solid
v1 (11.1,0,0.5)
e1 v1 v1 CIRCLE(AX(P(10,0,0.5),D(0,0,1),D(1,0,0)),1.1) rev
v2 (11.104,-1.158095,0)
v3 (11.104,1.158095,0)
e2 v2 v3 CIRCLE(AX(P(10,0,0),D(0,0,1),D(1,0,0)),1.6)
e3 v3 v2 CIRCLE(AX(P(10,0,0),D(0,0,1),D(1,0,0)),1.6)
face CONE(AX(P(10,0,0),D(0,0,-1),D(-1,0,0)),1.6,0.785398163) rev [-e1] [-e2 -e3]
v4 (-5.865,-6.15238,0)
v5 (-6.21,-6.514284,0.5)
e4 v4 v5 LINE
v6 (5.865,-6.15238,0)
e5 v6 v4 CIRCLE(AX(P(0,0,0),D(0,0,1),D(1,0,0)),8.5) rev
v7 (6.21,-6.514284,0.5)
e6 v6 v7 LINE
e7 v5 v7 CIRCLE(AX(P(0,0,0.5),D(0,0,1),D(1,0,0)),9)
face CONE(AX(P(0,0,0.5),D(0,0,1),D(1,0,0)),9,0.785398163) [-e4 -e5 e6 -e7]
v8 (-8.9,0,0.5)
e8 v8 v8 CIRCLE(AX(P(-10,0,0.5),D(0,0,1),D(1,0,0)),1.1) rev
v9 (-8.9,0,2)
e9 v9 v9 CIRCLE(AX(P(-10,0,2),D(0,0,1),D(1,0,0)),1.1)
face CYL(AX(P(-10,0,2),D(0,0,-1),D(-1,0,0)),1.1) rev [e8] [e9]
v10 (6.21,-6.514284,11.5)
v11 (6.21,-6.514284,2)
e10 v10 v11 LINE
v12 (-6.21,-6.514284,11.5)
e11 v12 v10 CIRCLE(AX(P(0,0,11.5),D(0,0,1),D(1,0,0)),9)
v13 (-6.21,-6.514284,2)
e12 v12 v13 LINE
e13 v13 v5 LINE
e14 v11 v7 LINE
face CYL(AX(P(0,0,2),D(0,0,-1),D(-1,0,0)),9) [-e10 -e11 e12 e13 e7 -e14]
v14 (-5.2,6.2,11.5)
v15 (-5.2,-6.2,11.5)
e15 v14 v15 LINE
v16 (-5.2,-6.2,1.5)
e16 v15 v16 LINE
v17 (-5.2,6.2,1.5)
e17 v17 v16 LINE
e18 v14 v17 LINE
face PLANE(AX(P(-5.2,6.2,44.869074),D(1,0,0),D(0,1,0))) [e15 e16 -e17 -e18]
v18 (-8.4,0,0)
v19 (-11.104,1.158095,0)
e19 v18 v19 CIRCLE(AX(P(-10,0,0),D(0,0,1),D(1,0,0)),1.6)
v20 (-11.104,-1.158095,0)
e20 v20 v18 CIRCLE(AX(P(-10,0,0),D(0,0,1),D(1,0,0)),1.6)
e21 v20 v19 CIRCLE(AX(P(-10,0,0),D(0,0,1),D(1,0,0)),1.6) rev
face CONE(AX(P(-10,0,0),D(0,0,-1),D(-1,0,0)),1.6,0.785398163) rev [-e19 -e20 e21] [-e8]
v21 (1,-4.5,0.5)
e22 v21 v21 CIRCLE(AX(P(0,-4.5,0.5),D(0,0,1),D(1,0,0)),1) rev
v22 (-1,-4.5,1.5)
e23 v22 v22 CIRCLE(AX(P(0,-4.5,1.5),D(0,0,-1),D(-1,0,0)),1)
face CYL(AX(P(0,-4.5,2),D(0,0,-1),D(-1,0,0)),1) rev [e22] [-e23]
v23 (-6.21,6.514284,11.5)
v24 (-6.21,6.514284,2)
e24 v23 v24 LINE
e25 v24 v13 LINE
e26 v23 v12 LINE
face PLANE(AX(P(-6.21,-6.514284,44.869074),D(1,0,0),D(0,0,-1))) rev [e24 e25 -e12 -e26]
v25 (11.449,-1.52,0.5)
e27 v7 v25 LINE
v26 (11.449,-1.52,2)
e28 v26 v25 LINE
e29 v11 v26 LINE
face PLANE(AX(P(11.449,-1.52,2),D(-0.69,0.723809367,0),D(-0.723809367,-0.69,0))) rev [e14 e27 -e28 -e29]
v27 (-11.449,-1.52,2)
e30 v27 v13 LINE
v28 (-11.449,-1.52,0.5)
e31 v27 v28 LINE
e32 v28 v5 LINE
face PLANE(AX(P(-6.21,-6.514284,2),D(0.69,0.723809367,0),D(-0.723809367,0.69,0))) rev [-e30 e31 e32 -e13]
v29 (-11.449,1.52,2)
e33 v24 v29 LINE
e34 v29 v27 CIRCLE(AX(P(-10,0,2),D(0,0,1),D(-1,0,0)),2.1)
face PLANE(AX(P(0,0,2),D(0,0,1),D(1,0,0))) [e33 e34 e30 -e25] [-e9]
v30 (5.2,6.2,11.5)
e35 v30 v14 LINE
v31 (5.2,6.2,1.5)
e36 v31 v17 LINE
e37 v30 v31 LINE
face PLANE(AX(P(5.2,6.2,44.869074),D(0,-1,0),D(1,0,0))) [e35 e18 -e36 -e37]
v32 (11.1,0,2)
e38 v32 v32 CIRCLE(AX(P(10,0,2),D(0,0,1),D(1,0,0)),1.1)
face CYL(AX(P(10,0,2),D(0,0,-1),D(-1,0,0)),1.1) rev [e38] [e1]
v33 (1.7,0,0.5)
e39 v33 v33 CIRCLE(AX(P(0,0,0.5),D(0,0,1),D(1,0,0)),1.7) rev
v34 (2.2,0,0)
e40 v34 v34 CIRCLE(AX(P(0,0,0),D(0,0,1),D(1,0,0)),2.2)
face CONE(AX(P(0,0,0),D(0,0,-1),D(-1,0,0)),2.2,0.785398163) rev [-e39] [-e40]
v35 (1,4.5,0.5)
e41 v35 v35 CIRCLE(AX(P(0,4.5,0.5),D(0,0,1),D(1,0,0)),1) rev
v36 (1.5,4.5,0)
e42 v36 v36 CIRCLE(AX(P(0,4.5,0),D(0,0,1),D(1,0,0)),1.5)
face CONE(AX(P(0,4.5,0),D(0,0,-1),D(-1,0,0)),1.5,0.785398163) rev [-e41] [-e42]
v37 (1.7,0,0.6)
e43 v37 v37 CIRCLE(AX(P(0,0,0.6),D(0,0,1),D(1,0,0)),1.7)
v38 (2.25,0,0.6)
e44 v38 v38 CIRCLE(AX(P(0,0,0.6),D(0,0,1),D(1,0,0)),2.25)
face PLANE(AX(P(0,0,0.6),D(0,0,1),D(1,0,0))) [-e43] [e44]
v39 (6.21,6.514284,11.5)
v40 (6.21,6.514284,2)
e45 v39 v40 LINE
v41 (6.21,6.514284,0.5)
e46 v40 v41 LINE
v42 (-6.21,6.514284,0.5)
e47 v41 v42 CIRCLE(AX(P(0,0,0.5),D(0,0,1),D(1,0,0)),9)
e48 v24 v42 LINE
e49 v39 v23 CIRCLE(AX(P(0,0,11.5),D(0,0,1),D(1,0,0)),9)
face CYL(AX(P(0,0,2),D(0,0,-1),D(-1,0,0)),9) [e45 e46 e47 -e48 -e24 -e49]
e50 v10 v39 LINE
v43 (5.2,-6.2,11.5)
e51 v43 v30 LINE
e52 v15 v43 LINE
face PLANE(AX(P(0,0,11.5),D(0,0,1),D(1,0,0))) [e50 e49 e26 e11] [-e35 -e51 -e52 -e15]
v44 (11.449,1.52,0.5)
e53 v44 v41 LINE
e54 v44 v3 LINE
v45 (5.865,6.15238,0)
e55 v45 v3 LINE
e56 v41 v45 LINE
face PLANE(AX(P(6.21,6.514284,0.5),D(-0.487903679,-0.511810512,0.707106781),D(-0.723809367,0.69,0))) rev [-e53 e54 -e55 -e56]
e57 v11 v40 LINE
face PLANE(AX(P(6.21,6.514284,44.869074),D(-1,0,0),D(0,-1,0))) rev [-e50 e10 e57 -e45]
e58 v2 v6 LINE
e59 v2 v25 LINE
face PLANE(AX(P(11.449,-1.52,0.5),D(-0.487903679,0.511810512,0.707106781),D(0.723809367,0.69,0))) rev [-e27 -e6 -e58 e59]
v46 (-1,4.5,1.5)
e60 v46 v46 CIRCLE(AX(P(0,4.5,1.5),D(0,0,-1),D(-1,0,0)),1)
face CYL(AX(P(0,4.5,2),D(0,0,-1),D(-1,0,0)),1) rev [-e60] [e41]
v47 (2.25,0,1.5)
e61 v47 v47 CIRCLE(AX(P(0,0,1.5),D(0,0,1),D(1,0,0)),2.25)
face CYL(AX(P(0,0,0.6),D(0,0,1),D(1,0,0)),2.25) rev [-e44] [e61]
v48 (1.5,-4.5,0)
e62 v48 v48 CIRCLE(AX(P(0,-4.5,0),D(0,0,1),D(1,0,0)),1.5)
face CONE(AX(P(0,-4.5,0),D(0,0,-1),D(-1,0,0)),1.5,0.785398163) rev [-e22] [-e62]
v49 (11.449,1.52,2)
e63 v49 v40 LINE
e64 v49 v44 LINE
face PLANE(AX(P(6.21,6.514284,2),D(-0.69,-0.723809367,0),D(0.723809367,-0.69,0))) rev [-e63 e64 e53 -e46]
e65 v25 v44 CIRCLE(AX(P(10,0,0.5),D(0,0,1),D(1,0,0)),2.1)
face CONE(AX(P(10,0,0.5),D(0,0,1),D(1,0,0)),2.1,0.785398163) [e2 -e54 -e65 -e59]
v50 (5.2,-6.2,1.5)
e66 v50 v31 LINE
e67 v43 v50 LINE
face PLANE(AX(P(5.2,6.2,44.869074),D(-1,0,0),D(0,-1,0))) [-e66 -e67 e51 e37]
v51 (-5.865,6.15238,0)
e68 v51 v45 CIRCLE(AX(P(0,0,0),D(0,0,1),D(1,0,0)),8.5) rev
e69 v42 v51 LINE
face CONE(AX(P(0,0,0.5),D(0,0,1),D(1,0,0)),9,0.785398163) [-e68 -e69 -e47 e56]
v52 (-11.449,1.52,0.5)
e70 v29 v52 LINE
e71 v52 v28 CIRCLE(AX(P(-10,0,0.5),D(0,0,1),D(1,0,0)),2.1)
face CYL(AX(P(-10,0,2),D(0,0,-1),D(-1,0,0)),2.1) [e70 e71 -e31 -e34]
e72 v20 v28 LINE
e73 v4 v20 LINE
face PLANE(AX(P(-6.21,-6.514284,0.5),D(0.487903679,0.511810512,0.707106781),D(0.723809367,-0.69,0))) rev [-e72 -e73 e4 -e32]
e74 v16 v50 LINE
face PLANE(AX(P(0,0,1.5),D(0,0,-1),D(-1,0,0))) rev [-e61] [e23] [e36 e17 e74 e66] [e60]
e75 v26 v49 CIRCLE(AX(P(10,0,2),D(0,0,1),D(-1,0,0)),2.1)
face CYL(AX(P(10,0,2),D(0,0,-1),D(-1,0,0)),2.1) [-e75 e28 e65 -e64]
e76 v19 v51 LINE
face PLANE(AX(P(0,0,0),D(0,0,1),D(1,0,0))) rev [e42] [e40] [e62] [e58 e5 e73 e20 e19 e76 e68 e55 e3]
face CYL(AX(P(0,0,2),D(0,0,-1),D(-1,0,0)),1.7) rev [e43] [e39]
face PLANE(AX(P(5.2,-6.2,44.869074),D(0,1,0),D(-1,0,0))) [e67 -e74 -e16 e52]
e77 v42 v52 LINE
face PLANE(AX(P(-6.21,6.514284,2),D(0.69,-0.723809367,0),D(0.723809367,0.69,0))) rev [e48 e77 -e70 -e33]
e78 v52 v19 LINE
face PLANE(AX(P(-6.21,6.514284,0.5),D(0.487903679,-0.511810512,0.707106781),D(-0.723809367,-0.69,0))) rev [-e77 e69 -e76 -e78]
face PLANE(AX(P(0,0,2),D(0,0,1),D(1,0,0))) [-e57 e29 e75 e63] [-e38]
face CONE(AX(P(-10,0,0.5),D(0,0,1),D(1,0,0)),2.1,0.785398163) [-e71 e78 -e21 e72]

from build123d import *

# Parameters (mm, degrees)
SKETCH_2_R          = 1.1
SKETCH_2_R_2        = 1
SKETCH_2_R_3        = 1.7
EXTRUDE_1_DEPTH     = 2
SKETCH_3_W          = 10.4
SKETCH_3_H          = 12.4
EXTRUDE_2_DEPTH     = 9.5
SKETCH_4_W          = 10.4
SKETCH_4_H          = 12.4
CUT_EXTRUDE_1_DEPTH = 0.5
SKETCH_5_R          = 2.25
CUT_EXTRUDE_2_DEPTH = 0.9
CHAMFER_1_SIZE      = 0.5


with BuildPart() as part:
    # Эскиз2 → Бобышка-Вытянуть1 (new body)
    with BuildSketch(Plane.XY):
        with BuildLine():
            Line((6.21, 6.514284305), (11.449, 1.519999671))
            ThreePointArc((11.449, 1.519999671), (12.1, 0), (11.449, -1.519999671))
            Line((11.449, -1.519999671), (6.21, -6.514284305))
            ThreePointArc((6.21, -6.514284305), (0, -9), (-6.21, -6.514284305))
            Line((-6.21, -6.514284305), (-11.449, -1.519999671))
            ThreePointArc((-11.449, -1.519999671), (-12.1, 0), (-11.449, 1.519999671))
            Line((-11.449, 1.519999671), (-6.21, 6.514284305))
            ThreePointArc((-6.21, 6.514284305), (0, 9), (6.21, 6.514284305))
        make_face()
        with Locations((10, 0)):
            Circle(SKETCH_2_R, mode=Mode.SUBTRACT)
        with Locations((-10, 0)):
            Circle(SKETCH_2_R, mode=Mode.SUBTRACT)
        with Locations((0, 4.5)):
            Circle(SKETCH_2_R_2, mode=Mode.SUBTRACT)
        with Locations(Location((0, -4.5, 0), (0, 0, 180))):
            Circle(SKETCH_2_R_2, mode=Mode.SUBTRACT)
        Circle(SKETCH_2_R_3, mode=Mode.SUBTRACT)
    extrude(amount=EXTRUDE_1_DEPTH)

    # Эскиз3 → Бобышка-Вытянуть2 (add)
    with BuildSketch(Plane.XY.offset(2)):
        with BuildLine():
            Line((6.21, 6.514284305), (6.21, -6.514284305))
            ThreePointArc((6.21, -6.514284305), (0, -9), (-6.21, -6.514284305))
            Line((-6.21, -6.514284305), (-6.21, 6.514284305))
            ThreePointArc((-6.21, 6.514284305), (0, 9), (6.21, 6.514284305))
        make_face()
        Rectangle(SKETCH_3_W, SKETCH_3_H, mode=Mode.SUBTRACT)
    extrude(amount=EXTRUDE_2_DEPTH)

    # Эскиз4 → Вырез-Вытянуть1 (cut)
    with BuildSketch(Plane.XY.offset(2)):
        Rectangle(SKETCH_4_W, SKETCH_4_H)
    extrude(amount=-CUT_EXTRUDE_1_DEPTH, mode=Mode.SUBTRACT)

    # Эскиз5 → Вырез-Вытянуть2 (cut)
    with BuildSketch(Plane.XY.offset(1.5)):
        Circle(SKETCH_5_R)
    extrude(amount=-CUT_EXTRUDE_2_DEPTH, mode=Mode.SUBTRACT)

    # Фаска1
    chamfer_1_edges = [part.edges().sort_by_distance(p)[0] for p in [
        (-8.8295, 4.017141988, 0),
        (0, 9, 0),
        (8.9, 0, 0),
        (-1, 4.5, 0),
        (1, -4.5, 0),
        (-1.7, 0, 0),
        (-11.1, 0, 0),
        (8.8295, 4.017141988, 0),
        (12.1, 0, 0),
        (8.8295, -4.017141988, 0),
        (0, -9, 0),
        (-8.8295, -4.017141988, 0),
        (-12.1, 0, 0),
    ]]
    chamfer(chamfer_1_edges, length=CHAMFER_1_SIZE - 0.0001)  # a hair under: the kernel refuses the full size


solid = part.part
